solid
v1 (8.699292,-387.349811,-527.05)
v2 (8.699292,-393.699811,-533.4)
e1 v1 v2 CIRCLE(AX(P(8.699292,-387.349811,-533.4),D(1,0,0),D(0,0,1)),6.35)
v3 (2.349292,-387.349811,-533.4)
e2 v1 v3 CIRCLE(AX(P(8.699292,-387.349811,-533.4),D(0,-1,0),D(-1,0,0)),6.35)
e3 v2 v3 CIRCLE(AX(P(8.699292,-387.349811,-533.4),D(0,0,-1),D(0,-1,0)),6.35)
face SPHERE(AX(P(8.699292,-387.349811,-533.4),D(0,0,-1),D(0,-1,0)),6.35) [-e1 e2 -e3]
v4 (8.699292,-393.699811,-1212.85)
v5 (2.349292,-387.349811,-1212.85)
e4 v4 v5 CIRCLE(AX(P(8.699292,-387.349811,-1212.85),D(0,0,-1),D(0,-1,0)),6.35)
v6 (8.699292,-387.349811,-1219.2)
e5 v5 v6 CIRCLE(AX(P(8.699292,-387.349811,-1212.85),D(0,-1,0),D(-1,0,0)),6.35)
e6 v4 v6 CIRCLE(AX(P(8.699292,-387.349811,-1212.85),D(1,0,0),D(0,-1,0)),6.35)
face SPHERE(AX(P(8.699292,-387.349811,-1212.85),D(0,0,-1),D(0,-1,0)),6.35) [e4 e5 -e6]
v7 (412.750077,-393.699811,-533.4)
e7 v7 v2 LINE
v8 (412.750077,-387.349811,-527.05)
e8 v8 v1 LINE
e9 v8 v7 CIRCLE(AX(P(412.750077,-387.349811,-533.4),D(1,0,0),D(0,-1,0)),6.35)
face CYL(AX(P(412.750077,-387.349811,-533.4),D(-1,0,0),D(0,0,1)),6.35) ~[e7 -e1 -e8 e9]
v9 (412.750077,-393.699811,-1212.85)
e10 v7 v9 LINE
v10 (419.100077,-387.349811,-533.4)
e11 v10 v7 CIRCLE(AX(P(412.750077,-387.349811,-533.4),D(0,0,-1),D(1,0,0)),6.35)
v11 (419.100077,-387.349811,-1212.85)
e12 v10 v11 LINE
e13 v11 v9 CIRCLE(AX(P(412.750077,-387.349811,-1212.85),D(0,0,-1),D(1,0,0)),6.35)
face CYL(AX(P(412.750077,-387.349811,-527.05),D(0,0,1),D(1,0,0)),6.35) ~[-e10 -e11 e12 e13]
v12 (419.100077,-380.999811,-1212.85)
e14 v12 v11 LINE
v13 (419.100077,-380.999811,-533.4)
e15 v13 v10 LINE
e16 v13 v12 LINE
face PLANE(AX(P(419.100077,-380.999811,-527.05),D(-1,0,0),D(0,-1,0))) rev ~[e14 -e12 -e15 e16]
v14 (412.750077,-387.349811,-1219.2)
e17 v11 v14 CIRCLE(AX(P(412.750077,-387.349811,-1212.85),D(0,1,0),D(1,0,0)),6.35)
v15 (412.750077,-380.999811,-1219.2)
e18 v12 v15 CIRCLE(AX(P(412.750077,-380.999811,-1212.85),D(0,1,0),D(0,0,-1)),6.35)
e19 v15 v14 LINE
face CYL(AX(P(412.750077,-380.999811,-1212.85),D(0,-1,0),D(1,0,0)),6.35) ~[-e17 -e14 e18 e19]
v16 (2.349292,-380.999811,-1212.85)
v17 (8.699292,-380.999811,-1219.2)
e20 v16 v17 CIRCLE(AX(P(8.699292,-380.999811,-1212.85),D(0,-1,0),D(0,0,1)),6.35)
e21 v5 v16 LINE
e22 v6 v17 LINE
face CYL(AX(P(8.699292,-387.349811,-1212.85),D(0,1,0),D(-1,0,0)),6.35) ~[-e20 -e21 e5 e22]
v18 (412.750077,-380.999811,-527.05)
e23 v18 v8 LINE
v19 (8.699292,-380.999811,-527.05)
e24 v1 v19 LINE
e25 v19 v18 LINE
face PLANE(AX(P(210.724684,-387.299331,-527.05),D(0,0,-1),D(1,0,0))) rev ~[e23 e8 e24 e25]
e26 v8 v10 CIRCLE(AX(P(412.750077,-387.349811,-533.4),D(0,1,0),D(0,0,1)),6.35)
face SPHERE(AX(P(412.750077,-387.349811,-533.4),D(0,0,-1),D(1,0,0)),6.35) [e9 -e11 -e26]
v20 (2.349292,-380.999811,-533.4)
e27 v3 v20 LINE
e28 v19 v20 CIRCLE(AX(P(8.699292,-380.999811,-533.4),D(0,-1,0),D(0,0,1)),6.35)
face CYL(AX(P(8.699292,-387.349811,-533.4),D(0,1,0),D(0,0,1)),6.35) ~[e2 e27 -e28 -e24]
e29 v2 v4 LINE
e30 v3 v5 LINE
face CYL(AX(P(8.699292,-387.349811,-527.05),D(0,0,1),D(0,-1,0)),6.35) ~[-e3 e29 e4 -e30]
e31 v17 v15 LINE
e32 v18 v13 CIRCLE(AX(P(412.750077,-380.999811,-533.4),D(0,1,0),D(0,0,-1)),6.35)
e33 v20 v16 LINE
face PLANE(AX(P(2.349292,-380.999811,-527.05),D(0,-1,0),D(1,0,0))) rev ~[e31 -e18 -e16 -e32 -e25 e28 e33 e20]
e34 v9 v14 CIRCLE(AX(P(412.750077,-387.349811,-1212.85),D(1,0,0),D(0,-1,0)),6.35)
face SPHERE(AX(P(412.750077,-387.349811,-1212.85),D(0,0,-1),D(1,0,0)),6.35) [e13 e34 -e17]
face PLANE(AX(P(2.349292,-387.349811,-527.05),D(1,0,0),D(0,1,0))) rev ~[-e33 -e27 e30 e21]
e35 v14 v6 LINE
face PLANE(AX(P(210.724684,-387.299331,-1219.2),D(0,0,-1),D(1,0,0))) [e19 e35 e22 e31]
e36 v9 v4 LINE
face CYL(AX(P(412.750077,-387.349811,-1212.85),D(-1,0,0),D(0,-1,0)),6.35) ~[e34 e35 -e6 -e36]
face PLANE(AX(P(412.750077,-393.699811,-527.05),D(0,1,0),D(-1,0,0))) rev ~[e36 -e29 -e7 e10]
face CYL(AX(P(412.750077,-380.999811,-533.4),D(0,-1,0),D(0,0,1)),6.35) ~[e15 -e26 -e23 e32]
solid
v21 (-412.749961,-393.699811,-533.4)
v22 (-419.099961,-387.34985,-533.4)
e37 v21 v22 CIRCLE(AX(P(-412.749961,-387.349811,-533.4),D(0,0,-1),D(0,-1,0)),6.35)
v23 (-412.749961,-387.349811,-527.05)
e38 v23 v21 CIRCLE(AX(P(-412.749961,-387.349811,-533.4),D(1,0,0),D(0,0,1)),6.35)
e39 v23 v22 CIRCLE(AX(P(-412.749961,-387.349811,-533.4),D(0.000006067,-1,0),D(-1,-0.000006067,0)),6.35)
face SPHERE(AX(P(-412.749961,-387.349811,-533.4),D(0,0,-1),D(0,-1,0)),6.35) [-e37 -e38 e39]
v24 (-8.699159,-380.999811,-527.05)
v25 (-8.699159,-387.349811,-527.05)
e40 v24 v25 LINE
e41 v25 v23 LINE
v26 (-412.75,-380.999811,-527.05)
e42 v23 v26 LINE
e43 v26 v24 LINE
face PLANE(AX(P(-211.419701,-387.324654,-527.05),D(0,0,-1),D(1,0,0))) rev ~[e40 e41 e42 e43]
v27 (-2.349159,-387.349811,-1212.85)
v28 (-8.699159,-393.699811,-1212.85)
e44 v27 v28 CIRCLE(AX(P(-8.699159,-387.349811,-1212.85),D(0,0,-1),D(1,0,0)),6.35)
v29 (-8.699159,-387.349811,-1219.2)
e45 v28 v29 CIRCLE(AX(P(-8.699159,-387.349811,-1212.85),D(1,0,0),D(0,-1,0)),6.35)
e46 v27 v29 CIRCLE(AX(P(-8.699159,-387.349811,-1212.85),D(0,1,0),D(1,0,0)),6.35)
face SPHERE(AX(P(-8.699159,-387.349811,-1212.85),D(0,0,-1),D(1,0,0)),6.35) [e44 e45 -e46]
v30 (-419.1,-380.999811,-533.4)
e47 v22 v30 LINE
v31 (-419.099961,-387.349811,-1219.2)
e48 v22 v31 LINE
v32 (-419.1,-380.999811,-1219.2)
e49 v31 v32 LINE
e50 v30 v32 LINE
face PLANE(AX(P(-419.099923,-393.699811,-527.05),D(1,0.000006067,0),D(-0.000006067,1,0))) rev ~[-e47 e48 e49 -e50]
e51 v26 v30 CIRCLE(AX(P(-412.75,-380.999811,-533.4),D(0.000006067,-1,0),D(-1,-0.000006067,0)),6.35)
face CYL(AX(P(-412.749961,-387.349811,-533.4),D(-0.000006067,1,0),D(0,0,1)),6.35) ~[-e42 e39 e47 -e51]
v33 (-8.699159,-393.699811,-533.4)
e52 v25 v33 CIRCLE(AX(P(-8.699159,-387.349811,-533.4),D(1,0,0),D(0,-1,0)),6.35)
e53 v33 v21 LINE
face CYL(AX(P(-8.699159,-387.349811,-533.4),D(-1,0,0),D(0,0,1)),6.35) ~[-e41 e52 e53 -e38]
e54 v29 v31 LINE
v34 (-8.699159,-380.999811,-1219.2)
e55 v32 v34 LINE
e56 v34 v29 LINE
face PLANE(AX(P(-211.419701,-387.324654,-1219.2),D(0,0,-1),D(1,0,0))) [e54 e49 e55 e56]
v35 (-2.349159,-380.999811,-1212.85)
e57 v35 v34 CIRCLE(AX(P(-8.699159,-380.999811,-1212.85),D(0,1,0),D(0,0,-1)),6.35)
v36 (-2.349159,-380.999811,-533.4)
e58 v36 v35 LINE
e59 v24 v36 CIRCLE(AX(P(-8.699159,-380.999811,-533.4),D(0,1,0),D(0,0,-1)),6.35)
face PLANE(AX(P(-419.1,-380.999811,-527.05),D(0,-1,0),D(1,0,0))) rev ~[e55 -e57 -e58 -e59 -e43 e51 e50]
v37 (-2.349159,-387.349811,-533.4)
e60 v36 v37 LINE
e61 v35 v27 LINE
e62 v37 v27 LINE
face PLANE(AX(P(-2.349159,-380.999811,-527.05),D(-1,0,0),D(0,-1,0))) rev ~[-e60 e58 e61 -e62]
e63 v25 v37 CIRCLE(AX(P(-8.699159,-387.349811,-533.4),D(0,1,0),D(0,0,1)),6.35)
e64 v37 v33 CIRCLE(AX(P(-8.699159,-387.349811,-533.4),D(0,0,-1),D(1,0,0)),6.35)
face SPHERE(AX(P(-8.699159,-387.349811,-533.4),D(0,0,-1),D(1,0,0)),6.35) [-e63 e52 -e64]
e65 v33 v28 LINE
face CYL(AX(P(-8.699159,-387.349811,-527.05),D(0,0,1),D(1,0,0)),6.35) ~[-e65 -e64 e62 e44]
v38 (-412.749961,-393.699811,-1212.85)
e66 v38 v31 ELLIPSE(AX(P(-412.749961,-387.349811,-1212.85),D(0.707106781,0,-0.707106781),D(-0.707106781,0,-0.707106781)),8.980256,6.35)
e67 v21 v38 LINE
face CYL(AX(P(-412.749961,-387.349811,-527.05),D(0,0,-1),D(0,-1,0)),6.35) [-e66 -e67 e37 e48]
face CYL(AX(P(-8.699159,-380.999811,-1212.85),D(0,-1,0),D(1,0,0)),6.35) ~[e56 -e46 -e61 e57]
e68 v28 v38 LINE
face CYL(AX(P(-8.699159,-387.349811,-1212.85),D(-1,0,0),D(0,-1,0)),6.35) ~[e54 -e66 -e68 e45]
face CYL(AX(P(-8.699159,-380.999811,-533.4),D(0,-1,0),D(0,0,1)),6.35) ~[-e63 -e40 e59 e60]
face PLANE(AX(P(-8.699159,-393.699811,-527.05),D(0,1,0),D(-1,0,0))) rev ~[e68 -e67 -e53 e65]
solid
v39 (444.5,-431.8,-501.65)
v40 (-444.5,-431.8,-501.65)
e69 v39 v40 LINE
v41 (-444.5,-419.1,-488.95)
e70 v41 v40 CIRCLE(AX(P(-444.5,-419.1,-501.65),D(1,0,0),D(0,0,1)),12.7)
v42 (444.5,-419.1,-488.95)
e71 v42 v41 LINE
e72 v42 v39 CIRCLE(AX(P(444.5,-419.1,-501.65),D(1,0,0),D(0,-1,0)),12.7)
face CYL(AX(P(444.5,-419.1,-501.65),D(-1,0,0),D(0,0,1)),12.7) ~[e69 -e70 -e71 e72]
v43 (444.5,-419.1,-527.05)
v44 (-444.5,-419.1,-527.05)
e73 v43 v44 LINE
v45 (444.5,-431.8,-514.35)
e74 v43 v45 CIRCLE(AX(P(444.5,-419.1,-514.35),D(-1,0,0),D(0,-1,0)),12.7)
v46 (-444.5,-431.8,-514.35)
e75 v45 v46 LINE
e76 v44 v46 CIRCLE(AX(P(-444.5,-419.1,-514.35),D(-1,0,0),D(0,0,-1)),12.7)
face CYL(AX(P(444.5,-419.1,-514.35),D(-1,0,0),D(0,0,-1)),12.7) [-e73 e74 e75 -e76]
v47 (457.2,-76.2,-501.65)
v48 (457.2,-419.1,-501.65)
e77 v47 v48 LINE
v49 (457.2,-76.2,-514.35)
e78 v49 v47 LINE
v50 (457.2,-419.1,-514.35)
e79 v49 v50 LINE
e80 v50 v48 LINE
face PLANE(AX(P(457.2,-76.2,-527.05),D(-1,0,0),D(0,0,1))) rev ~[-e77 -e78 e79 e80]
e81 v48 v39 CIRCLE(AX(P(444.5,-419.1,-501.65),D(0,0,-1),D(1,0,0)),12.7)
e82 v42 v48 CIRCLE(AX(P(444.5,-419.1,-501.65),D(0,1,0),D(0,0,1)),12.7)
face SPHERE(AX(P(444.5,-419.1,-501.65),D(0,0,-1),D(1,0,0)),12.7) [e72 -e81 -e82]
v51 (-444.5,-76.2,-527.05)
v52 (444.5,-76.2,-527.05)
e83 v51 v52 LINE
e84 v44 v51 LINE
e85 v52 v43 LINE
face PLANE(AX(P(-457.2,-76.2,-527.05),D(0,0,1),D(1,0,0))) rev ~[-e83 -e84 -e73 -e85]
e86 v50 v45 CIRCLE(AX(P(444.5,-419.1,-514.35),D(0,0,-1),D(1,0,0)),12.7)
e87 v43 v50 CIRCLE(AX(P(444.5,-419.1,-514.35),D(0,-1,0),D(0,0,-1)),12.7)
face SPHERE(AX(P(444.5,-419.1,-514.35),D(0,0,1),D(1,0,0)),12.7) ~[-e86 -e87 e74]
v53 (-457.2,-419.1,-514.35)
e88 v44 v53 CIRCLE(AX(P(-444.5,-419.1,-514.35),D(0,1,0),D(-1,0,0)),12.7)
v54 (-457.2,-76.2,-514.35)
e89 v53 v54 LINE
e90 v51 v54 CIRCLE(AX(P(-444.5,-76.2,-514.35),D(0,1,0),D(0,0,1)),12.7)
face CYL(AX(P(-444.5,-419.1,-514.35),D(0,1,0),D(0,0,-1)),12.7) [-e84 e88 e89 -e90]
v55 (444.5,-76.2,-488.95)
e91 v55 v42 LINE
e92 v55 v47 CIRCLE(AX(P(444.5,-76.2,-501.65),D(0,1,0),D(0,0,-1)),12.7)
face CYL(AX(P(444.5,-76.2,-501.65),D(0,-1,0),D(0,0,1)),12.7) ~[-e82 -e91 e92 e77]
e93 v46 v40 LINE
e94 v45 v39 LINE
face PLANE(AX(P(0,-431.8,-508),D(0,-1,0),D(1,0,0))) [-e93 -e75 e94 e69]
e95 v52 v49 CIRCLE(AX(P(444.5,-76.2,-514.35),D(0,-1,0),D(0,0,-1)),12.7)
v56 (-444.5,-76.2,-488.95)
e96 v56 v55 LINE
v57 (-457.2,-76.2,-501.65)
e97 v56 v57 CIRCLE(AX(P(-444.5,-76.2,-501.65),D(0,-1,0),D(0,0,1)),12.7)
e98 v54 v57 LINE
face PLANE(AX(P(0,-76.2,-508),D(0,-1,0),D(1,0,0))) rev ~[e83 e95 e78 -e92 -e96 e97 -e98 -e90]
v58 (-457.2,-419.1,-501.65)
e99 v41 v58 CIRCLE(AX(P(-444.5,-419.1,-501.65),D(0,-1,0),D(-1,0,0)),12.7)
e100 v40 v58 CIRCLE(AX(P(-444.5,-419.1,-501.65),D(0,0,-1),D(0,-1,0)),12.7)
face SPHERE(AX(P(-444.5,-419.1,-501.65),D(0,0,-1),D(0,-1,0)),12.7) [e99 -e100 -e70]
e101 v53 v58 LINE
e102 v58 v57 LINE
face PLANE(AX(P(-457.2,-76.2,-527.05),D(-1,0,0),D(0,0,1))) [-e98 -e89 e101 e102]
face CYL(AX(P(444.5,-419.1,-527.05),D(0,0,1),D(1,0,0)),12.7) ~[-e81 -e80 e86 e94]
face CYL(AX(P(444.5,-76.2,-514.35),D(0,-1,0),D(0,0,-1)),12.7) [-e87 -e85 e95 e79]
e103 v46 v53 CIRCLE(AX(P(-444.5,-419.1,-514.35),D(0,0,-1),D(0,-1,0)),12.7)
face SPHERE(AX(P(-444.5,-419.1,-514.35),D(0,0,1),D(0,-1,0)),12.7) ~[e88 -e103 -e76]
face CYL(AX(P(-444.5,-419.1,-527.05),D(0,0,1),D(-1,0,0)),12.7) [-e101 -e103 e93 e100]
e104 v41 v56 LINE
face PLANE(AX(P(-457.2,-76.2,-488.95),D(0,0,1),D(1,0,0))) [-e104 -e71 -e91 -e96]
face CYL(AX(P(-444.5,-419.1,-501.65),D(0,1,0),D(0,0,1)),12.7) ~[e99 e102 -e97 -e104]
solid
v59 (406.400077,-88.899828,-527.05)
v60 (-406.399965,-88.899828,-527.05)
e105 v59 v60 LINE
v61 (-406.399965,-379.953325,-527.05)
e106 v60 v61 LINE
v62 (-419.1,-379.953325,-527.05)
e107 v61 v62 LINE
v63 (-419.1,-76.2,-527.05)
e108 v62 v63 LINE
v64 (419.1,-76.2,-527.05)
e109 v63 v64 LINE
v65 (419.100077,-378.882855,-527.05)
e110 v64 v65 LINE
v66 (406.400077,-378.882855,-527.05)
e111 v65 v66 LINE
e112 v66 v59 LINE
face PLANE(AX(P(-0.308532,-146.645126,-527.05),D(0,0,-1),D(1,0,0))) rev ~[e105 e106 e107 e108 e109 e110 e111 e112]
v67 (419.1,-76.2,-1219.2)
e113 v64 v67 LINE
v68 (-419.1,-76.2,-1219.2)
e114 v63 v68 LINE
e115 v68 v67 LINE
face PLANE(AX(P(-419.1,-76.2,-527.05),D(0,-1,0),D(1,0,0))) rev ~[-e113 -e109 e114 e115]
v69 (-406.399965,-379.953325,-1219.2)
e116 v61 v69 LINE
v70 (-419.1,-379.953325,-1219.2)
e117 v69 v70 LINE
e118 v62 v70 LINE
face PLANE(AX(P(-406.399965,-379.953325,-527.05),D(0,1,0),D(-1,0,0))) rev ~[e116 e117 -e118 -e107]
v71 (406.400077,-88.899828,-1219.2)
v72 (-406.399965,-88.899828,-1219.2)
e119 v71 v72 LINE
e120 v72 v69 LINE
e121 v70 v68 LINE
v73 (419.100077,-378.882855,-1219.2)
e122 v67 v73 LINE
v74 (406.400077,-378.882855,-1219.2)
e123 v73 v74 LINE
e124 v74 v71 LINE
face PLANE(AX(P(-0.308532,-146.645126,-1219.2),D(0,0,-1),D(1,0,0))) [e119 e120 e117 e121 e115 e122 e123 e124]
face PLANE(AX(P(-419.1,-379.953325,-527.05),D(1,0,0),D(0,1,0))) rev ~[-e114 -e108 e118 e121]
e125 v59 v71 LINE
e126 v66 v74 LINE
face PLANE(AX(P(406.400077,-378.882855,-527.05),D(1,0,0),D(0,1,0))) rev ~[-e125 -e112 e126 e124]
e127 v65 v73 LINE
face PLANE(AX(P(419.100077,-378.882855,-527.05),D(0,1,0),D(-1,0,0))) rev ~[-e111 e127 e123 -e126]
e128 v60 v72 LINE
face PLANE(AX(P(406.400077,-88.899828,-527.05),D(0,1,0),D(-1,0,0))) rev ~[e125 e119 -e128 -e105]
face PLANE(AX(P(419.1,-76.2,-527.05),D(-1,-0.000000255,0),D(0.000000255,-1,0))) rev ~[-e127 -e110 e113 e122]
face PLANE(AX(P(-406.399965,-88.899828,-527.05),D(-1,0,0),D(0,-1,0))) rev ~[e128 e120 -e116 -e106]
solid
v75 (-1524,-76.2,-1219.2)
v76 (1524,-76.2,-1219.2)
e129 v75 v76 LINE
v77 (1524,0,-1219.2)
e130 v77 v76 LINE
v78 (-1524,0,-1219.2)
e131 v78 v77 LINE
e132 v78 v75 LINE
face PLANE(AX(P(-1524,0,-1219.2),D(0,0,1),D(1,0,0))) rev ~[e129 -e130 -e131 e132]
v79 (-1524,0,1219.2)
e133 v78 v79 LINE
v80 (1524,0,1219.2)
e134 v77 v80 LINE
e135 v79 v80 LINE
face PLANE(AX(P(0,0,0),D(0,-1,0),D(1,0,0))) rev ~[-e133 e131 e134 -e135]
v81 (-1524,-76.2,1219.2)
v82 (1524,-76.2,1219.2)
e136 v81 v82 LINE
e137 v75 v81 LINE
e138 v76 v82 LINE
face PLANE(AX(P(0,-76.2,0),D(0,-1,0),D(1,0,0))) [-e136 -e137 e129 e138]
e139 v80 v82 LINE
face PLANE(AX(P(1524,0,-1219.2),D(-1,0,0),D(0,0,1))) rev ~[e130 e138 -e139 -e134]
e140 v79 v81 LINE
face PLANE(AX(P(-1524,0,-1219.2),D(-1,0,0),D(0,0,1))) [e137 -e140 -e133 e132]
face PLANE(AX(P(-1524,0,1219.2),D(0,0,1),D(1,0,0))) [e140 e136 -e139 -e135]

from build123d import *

# Parameters (mm, degrees)
F0_W     = 3048
F0_H     = 2438.4
F1_DEPTH = 76.2
F2_W     = 914.4
F2_H     = 38.1
F3_DEPTH = 355.6
F4_R     = 12.7
F5_R     = 12.7
F7_DEPTH = 692.15
F8_R     = 6.35
F8_2_R   = 6.35
F9_R     = 6.35
F9_2_R   = 6.35


# Not quite as in the source:
# - ends of sketch curves that miss each other by under 0.0002 mm in the source are joined


with BuildPart() as f1:
    # F0 (on Front) → F1 (new body)
    with BuildSketch(Plane.XZ):
        Rectangle(F0_W, F0_H)
    extrude(amount=F1_DEPTH)


with BuildPart() as f3:
    # F2 (on face) → F3 (new body)
    with BuildSketch(Plane.XZ.offset(76.2)):
        with Locations((0, -508)):
            Rectangle(F2_W, F2_H)
    extrude(amount=F3_DEPTH)

    # F4
    f4_edges = [f3.edges().sort_by_distance(p)[0] for p in [
        (457.2, -431.8, -508),
        (-457.2, -431.8, -508),
    ]]
    fillet(f4_edges, radius=F4_R)

    # F5
    f5_edges = [f3.edges().sort_by_distance(p)[0] for p in [
        (457.2, -247.65, -488.95),
        (457.2, -247.65, -527.05),
        (0, -431.8, -488.95),
        (0, -431.8, -527.05),
        (-457.2, -247.65, -488.95),
        (-457.2, -247.65, -527.05),
    ]]
    fillet(f5_edges, radius=F5_R)


with BuildPart() as f7:
    # F6 (on face) → F7 (new body)
    with BuildSketch(Plane(origin=(0, 0, -527.05), x_dir=(1, 0, 0), z_dir=(0, 0, -1))):
        Polygon((-419.1, 379.9533247948), (-419.1, 76.2), (419.1, 76.2), (419.100077045, 378.8828551769), (406.400077045, 378.8828551769), (406.400077045, 88.8998284936), (-406.3999652863, 88.8998284936), (-406.3999652863, 379.9533247948), align=None)
    extrude(amount=F7_DEPTH)


with BuildPart() as f7b:
    # F6 (on face) → F7, piece 2 (new body)
    with BuildSketch(Plane(origin=(0, 0, -527.05), x_dir=(1, 0, 0), z_dir=(0, 0, -1))):
        with BuildLine():
            Line((-419.1, 380.9998109937), (-406.3999652863, 380.9998109937))
            Line((-406.3999652863, 380.9998109937), (-2.349158771, 380.9998109937))
            Line((-2.349158771, 380.9998109937), (-2.349158771, 387.3498109937))
            ThreePointArc((-2.349158771, 387.3498109937), (-4.2090307104, 391.8399390542), (-8.699158771, 393.6998109937))
            Line((-8.699158771, 393.6998109937), (-419.099922955, 393.6998109937))
            Line((-419.099922955, 393.6998109937), (-419.1, 380.9998109937))
        make_face()
    extrude(amount=F7_DEPTH)

    # F8#2
    f8_2_edges = [f7b.edges().sort_by_distance(p)[0] for p in [
        (-213.899541, -393.699811, -1219.2),
        (-419.099923, -393.699811, -873.125),
    ]]
    fillet(f8_2_edges, radius=F8_2_R)

    # F9
    f9_edges = [f7b.edges().sort_by_distance(p)[0] for p in [
        (-210.72456, -393.699811, -527.05),
    ]]
    fillet(f9_edges, radius=F9_R)


with BuildPart() as f7c:
    # F6 (on face) → F7, piece 3 (new body)
    with BuildSketch(Plane(origin=(0, 0, -527.05), x_dir=(1, 0, 0), z_dir=(0, 0, -1))):
        with BuildLine():
            Line((419.100077045, 380.9998109937), (419.100077045, 387.3498109937))
            ThreePointArc((419.100077045, 387.3498109937), (417.2402051055, 391.8399390542), (412.750077045, 393.6998109937))
            Line((412.750077045, 393.6998109937), (8.6992916953, 393.6998109937))
            ThreePointArc((8.6992916953, 393.6998109937), (4.2091636347, 391.8399390542), (2.3492916953, 387.3498109937))
            Line((2.3492916953, 387.3498109937), (2.3492916953, 380.9998109937))
            Line((2.3492916953, 380.9998109937), (406.400077045, 380.9998109937))
            Line((406.400077045, 380.9998109937), (419.100077045, 380.9998109937))
        make_face()
    extrude(amount=F7_DEPTH)

    # F8
    f8_edges = [f7c.edges().sort_by_distance(p)[0] for p in [
        (210.724684, -393.699811, -1219.2),
    ]]
    fillet(f8_edges, radius=F8_R)

    # F9#2
    f9_2_edges = [f7c.edges().sort_by_distance(p)[0] for p in [
        (210.724684, -393.699811, -527.05),
    ]]
    fillet(f9_2_edges, radius=F9_2_R)


solid = Compound([f1.part, f3.part, f7.part, f7b.part, f7c.part])
